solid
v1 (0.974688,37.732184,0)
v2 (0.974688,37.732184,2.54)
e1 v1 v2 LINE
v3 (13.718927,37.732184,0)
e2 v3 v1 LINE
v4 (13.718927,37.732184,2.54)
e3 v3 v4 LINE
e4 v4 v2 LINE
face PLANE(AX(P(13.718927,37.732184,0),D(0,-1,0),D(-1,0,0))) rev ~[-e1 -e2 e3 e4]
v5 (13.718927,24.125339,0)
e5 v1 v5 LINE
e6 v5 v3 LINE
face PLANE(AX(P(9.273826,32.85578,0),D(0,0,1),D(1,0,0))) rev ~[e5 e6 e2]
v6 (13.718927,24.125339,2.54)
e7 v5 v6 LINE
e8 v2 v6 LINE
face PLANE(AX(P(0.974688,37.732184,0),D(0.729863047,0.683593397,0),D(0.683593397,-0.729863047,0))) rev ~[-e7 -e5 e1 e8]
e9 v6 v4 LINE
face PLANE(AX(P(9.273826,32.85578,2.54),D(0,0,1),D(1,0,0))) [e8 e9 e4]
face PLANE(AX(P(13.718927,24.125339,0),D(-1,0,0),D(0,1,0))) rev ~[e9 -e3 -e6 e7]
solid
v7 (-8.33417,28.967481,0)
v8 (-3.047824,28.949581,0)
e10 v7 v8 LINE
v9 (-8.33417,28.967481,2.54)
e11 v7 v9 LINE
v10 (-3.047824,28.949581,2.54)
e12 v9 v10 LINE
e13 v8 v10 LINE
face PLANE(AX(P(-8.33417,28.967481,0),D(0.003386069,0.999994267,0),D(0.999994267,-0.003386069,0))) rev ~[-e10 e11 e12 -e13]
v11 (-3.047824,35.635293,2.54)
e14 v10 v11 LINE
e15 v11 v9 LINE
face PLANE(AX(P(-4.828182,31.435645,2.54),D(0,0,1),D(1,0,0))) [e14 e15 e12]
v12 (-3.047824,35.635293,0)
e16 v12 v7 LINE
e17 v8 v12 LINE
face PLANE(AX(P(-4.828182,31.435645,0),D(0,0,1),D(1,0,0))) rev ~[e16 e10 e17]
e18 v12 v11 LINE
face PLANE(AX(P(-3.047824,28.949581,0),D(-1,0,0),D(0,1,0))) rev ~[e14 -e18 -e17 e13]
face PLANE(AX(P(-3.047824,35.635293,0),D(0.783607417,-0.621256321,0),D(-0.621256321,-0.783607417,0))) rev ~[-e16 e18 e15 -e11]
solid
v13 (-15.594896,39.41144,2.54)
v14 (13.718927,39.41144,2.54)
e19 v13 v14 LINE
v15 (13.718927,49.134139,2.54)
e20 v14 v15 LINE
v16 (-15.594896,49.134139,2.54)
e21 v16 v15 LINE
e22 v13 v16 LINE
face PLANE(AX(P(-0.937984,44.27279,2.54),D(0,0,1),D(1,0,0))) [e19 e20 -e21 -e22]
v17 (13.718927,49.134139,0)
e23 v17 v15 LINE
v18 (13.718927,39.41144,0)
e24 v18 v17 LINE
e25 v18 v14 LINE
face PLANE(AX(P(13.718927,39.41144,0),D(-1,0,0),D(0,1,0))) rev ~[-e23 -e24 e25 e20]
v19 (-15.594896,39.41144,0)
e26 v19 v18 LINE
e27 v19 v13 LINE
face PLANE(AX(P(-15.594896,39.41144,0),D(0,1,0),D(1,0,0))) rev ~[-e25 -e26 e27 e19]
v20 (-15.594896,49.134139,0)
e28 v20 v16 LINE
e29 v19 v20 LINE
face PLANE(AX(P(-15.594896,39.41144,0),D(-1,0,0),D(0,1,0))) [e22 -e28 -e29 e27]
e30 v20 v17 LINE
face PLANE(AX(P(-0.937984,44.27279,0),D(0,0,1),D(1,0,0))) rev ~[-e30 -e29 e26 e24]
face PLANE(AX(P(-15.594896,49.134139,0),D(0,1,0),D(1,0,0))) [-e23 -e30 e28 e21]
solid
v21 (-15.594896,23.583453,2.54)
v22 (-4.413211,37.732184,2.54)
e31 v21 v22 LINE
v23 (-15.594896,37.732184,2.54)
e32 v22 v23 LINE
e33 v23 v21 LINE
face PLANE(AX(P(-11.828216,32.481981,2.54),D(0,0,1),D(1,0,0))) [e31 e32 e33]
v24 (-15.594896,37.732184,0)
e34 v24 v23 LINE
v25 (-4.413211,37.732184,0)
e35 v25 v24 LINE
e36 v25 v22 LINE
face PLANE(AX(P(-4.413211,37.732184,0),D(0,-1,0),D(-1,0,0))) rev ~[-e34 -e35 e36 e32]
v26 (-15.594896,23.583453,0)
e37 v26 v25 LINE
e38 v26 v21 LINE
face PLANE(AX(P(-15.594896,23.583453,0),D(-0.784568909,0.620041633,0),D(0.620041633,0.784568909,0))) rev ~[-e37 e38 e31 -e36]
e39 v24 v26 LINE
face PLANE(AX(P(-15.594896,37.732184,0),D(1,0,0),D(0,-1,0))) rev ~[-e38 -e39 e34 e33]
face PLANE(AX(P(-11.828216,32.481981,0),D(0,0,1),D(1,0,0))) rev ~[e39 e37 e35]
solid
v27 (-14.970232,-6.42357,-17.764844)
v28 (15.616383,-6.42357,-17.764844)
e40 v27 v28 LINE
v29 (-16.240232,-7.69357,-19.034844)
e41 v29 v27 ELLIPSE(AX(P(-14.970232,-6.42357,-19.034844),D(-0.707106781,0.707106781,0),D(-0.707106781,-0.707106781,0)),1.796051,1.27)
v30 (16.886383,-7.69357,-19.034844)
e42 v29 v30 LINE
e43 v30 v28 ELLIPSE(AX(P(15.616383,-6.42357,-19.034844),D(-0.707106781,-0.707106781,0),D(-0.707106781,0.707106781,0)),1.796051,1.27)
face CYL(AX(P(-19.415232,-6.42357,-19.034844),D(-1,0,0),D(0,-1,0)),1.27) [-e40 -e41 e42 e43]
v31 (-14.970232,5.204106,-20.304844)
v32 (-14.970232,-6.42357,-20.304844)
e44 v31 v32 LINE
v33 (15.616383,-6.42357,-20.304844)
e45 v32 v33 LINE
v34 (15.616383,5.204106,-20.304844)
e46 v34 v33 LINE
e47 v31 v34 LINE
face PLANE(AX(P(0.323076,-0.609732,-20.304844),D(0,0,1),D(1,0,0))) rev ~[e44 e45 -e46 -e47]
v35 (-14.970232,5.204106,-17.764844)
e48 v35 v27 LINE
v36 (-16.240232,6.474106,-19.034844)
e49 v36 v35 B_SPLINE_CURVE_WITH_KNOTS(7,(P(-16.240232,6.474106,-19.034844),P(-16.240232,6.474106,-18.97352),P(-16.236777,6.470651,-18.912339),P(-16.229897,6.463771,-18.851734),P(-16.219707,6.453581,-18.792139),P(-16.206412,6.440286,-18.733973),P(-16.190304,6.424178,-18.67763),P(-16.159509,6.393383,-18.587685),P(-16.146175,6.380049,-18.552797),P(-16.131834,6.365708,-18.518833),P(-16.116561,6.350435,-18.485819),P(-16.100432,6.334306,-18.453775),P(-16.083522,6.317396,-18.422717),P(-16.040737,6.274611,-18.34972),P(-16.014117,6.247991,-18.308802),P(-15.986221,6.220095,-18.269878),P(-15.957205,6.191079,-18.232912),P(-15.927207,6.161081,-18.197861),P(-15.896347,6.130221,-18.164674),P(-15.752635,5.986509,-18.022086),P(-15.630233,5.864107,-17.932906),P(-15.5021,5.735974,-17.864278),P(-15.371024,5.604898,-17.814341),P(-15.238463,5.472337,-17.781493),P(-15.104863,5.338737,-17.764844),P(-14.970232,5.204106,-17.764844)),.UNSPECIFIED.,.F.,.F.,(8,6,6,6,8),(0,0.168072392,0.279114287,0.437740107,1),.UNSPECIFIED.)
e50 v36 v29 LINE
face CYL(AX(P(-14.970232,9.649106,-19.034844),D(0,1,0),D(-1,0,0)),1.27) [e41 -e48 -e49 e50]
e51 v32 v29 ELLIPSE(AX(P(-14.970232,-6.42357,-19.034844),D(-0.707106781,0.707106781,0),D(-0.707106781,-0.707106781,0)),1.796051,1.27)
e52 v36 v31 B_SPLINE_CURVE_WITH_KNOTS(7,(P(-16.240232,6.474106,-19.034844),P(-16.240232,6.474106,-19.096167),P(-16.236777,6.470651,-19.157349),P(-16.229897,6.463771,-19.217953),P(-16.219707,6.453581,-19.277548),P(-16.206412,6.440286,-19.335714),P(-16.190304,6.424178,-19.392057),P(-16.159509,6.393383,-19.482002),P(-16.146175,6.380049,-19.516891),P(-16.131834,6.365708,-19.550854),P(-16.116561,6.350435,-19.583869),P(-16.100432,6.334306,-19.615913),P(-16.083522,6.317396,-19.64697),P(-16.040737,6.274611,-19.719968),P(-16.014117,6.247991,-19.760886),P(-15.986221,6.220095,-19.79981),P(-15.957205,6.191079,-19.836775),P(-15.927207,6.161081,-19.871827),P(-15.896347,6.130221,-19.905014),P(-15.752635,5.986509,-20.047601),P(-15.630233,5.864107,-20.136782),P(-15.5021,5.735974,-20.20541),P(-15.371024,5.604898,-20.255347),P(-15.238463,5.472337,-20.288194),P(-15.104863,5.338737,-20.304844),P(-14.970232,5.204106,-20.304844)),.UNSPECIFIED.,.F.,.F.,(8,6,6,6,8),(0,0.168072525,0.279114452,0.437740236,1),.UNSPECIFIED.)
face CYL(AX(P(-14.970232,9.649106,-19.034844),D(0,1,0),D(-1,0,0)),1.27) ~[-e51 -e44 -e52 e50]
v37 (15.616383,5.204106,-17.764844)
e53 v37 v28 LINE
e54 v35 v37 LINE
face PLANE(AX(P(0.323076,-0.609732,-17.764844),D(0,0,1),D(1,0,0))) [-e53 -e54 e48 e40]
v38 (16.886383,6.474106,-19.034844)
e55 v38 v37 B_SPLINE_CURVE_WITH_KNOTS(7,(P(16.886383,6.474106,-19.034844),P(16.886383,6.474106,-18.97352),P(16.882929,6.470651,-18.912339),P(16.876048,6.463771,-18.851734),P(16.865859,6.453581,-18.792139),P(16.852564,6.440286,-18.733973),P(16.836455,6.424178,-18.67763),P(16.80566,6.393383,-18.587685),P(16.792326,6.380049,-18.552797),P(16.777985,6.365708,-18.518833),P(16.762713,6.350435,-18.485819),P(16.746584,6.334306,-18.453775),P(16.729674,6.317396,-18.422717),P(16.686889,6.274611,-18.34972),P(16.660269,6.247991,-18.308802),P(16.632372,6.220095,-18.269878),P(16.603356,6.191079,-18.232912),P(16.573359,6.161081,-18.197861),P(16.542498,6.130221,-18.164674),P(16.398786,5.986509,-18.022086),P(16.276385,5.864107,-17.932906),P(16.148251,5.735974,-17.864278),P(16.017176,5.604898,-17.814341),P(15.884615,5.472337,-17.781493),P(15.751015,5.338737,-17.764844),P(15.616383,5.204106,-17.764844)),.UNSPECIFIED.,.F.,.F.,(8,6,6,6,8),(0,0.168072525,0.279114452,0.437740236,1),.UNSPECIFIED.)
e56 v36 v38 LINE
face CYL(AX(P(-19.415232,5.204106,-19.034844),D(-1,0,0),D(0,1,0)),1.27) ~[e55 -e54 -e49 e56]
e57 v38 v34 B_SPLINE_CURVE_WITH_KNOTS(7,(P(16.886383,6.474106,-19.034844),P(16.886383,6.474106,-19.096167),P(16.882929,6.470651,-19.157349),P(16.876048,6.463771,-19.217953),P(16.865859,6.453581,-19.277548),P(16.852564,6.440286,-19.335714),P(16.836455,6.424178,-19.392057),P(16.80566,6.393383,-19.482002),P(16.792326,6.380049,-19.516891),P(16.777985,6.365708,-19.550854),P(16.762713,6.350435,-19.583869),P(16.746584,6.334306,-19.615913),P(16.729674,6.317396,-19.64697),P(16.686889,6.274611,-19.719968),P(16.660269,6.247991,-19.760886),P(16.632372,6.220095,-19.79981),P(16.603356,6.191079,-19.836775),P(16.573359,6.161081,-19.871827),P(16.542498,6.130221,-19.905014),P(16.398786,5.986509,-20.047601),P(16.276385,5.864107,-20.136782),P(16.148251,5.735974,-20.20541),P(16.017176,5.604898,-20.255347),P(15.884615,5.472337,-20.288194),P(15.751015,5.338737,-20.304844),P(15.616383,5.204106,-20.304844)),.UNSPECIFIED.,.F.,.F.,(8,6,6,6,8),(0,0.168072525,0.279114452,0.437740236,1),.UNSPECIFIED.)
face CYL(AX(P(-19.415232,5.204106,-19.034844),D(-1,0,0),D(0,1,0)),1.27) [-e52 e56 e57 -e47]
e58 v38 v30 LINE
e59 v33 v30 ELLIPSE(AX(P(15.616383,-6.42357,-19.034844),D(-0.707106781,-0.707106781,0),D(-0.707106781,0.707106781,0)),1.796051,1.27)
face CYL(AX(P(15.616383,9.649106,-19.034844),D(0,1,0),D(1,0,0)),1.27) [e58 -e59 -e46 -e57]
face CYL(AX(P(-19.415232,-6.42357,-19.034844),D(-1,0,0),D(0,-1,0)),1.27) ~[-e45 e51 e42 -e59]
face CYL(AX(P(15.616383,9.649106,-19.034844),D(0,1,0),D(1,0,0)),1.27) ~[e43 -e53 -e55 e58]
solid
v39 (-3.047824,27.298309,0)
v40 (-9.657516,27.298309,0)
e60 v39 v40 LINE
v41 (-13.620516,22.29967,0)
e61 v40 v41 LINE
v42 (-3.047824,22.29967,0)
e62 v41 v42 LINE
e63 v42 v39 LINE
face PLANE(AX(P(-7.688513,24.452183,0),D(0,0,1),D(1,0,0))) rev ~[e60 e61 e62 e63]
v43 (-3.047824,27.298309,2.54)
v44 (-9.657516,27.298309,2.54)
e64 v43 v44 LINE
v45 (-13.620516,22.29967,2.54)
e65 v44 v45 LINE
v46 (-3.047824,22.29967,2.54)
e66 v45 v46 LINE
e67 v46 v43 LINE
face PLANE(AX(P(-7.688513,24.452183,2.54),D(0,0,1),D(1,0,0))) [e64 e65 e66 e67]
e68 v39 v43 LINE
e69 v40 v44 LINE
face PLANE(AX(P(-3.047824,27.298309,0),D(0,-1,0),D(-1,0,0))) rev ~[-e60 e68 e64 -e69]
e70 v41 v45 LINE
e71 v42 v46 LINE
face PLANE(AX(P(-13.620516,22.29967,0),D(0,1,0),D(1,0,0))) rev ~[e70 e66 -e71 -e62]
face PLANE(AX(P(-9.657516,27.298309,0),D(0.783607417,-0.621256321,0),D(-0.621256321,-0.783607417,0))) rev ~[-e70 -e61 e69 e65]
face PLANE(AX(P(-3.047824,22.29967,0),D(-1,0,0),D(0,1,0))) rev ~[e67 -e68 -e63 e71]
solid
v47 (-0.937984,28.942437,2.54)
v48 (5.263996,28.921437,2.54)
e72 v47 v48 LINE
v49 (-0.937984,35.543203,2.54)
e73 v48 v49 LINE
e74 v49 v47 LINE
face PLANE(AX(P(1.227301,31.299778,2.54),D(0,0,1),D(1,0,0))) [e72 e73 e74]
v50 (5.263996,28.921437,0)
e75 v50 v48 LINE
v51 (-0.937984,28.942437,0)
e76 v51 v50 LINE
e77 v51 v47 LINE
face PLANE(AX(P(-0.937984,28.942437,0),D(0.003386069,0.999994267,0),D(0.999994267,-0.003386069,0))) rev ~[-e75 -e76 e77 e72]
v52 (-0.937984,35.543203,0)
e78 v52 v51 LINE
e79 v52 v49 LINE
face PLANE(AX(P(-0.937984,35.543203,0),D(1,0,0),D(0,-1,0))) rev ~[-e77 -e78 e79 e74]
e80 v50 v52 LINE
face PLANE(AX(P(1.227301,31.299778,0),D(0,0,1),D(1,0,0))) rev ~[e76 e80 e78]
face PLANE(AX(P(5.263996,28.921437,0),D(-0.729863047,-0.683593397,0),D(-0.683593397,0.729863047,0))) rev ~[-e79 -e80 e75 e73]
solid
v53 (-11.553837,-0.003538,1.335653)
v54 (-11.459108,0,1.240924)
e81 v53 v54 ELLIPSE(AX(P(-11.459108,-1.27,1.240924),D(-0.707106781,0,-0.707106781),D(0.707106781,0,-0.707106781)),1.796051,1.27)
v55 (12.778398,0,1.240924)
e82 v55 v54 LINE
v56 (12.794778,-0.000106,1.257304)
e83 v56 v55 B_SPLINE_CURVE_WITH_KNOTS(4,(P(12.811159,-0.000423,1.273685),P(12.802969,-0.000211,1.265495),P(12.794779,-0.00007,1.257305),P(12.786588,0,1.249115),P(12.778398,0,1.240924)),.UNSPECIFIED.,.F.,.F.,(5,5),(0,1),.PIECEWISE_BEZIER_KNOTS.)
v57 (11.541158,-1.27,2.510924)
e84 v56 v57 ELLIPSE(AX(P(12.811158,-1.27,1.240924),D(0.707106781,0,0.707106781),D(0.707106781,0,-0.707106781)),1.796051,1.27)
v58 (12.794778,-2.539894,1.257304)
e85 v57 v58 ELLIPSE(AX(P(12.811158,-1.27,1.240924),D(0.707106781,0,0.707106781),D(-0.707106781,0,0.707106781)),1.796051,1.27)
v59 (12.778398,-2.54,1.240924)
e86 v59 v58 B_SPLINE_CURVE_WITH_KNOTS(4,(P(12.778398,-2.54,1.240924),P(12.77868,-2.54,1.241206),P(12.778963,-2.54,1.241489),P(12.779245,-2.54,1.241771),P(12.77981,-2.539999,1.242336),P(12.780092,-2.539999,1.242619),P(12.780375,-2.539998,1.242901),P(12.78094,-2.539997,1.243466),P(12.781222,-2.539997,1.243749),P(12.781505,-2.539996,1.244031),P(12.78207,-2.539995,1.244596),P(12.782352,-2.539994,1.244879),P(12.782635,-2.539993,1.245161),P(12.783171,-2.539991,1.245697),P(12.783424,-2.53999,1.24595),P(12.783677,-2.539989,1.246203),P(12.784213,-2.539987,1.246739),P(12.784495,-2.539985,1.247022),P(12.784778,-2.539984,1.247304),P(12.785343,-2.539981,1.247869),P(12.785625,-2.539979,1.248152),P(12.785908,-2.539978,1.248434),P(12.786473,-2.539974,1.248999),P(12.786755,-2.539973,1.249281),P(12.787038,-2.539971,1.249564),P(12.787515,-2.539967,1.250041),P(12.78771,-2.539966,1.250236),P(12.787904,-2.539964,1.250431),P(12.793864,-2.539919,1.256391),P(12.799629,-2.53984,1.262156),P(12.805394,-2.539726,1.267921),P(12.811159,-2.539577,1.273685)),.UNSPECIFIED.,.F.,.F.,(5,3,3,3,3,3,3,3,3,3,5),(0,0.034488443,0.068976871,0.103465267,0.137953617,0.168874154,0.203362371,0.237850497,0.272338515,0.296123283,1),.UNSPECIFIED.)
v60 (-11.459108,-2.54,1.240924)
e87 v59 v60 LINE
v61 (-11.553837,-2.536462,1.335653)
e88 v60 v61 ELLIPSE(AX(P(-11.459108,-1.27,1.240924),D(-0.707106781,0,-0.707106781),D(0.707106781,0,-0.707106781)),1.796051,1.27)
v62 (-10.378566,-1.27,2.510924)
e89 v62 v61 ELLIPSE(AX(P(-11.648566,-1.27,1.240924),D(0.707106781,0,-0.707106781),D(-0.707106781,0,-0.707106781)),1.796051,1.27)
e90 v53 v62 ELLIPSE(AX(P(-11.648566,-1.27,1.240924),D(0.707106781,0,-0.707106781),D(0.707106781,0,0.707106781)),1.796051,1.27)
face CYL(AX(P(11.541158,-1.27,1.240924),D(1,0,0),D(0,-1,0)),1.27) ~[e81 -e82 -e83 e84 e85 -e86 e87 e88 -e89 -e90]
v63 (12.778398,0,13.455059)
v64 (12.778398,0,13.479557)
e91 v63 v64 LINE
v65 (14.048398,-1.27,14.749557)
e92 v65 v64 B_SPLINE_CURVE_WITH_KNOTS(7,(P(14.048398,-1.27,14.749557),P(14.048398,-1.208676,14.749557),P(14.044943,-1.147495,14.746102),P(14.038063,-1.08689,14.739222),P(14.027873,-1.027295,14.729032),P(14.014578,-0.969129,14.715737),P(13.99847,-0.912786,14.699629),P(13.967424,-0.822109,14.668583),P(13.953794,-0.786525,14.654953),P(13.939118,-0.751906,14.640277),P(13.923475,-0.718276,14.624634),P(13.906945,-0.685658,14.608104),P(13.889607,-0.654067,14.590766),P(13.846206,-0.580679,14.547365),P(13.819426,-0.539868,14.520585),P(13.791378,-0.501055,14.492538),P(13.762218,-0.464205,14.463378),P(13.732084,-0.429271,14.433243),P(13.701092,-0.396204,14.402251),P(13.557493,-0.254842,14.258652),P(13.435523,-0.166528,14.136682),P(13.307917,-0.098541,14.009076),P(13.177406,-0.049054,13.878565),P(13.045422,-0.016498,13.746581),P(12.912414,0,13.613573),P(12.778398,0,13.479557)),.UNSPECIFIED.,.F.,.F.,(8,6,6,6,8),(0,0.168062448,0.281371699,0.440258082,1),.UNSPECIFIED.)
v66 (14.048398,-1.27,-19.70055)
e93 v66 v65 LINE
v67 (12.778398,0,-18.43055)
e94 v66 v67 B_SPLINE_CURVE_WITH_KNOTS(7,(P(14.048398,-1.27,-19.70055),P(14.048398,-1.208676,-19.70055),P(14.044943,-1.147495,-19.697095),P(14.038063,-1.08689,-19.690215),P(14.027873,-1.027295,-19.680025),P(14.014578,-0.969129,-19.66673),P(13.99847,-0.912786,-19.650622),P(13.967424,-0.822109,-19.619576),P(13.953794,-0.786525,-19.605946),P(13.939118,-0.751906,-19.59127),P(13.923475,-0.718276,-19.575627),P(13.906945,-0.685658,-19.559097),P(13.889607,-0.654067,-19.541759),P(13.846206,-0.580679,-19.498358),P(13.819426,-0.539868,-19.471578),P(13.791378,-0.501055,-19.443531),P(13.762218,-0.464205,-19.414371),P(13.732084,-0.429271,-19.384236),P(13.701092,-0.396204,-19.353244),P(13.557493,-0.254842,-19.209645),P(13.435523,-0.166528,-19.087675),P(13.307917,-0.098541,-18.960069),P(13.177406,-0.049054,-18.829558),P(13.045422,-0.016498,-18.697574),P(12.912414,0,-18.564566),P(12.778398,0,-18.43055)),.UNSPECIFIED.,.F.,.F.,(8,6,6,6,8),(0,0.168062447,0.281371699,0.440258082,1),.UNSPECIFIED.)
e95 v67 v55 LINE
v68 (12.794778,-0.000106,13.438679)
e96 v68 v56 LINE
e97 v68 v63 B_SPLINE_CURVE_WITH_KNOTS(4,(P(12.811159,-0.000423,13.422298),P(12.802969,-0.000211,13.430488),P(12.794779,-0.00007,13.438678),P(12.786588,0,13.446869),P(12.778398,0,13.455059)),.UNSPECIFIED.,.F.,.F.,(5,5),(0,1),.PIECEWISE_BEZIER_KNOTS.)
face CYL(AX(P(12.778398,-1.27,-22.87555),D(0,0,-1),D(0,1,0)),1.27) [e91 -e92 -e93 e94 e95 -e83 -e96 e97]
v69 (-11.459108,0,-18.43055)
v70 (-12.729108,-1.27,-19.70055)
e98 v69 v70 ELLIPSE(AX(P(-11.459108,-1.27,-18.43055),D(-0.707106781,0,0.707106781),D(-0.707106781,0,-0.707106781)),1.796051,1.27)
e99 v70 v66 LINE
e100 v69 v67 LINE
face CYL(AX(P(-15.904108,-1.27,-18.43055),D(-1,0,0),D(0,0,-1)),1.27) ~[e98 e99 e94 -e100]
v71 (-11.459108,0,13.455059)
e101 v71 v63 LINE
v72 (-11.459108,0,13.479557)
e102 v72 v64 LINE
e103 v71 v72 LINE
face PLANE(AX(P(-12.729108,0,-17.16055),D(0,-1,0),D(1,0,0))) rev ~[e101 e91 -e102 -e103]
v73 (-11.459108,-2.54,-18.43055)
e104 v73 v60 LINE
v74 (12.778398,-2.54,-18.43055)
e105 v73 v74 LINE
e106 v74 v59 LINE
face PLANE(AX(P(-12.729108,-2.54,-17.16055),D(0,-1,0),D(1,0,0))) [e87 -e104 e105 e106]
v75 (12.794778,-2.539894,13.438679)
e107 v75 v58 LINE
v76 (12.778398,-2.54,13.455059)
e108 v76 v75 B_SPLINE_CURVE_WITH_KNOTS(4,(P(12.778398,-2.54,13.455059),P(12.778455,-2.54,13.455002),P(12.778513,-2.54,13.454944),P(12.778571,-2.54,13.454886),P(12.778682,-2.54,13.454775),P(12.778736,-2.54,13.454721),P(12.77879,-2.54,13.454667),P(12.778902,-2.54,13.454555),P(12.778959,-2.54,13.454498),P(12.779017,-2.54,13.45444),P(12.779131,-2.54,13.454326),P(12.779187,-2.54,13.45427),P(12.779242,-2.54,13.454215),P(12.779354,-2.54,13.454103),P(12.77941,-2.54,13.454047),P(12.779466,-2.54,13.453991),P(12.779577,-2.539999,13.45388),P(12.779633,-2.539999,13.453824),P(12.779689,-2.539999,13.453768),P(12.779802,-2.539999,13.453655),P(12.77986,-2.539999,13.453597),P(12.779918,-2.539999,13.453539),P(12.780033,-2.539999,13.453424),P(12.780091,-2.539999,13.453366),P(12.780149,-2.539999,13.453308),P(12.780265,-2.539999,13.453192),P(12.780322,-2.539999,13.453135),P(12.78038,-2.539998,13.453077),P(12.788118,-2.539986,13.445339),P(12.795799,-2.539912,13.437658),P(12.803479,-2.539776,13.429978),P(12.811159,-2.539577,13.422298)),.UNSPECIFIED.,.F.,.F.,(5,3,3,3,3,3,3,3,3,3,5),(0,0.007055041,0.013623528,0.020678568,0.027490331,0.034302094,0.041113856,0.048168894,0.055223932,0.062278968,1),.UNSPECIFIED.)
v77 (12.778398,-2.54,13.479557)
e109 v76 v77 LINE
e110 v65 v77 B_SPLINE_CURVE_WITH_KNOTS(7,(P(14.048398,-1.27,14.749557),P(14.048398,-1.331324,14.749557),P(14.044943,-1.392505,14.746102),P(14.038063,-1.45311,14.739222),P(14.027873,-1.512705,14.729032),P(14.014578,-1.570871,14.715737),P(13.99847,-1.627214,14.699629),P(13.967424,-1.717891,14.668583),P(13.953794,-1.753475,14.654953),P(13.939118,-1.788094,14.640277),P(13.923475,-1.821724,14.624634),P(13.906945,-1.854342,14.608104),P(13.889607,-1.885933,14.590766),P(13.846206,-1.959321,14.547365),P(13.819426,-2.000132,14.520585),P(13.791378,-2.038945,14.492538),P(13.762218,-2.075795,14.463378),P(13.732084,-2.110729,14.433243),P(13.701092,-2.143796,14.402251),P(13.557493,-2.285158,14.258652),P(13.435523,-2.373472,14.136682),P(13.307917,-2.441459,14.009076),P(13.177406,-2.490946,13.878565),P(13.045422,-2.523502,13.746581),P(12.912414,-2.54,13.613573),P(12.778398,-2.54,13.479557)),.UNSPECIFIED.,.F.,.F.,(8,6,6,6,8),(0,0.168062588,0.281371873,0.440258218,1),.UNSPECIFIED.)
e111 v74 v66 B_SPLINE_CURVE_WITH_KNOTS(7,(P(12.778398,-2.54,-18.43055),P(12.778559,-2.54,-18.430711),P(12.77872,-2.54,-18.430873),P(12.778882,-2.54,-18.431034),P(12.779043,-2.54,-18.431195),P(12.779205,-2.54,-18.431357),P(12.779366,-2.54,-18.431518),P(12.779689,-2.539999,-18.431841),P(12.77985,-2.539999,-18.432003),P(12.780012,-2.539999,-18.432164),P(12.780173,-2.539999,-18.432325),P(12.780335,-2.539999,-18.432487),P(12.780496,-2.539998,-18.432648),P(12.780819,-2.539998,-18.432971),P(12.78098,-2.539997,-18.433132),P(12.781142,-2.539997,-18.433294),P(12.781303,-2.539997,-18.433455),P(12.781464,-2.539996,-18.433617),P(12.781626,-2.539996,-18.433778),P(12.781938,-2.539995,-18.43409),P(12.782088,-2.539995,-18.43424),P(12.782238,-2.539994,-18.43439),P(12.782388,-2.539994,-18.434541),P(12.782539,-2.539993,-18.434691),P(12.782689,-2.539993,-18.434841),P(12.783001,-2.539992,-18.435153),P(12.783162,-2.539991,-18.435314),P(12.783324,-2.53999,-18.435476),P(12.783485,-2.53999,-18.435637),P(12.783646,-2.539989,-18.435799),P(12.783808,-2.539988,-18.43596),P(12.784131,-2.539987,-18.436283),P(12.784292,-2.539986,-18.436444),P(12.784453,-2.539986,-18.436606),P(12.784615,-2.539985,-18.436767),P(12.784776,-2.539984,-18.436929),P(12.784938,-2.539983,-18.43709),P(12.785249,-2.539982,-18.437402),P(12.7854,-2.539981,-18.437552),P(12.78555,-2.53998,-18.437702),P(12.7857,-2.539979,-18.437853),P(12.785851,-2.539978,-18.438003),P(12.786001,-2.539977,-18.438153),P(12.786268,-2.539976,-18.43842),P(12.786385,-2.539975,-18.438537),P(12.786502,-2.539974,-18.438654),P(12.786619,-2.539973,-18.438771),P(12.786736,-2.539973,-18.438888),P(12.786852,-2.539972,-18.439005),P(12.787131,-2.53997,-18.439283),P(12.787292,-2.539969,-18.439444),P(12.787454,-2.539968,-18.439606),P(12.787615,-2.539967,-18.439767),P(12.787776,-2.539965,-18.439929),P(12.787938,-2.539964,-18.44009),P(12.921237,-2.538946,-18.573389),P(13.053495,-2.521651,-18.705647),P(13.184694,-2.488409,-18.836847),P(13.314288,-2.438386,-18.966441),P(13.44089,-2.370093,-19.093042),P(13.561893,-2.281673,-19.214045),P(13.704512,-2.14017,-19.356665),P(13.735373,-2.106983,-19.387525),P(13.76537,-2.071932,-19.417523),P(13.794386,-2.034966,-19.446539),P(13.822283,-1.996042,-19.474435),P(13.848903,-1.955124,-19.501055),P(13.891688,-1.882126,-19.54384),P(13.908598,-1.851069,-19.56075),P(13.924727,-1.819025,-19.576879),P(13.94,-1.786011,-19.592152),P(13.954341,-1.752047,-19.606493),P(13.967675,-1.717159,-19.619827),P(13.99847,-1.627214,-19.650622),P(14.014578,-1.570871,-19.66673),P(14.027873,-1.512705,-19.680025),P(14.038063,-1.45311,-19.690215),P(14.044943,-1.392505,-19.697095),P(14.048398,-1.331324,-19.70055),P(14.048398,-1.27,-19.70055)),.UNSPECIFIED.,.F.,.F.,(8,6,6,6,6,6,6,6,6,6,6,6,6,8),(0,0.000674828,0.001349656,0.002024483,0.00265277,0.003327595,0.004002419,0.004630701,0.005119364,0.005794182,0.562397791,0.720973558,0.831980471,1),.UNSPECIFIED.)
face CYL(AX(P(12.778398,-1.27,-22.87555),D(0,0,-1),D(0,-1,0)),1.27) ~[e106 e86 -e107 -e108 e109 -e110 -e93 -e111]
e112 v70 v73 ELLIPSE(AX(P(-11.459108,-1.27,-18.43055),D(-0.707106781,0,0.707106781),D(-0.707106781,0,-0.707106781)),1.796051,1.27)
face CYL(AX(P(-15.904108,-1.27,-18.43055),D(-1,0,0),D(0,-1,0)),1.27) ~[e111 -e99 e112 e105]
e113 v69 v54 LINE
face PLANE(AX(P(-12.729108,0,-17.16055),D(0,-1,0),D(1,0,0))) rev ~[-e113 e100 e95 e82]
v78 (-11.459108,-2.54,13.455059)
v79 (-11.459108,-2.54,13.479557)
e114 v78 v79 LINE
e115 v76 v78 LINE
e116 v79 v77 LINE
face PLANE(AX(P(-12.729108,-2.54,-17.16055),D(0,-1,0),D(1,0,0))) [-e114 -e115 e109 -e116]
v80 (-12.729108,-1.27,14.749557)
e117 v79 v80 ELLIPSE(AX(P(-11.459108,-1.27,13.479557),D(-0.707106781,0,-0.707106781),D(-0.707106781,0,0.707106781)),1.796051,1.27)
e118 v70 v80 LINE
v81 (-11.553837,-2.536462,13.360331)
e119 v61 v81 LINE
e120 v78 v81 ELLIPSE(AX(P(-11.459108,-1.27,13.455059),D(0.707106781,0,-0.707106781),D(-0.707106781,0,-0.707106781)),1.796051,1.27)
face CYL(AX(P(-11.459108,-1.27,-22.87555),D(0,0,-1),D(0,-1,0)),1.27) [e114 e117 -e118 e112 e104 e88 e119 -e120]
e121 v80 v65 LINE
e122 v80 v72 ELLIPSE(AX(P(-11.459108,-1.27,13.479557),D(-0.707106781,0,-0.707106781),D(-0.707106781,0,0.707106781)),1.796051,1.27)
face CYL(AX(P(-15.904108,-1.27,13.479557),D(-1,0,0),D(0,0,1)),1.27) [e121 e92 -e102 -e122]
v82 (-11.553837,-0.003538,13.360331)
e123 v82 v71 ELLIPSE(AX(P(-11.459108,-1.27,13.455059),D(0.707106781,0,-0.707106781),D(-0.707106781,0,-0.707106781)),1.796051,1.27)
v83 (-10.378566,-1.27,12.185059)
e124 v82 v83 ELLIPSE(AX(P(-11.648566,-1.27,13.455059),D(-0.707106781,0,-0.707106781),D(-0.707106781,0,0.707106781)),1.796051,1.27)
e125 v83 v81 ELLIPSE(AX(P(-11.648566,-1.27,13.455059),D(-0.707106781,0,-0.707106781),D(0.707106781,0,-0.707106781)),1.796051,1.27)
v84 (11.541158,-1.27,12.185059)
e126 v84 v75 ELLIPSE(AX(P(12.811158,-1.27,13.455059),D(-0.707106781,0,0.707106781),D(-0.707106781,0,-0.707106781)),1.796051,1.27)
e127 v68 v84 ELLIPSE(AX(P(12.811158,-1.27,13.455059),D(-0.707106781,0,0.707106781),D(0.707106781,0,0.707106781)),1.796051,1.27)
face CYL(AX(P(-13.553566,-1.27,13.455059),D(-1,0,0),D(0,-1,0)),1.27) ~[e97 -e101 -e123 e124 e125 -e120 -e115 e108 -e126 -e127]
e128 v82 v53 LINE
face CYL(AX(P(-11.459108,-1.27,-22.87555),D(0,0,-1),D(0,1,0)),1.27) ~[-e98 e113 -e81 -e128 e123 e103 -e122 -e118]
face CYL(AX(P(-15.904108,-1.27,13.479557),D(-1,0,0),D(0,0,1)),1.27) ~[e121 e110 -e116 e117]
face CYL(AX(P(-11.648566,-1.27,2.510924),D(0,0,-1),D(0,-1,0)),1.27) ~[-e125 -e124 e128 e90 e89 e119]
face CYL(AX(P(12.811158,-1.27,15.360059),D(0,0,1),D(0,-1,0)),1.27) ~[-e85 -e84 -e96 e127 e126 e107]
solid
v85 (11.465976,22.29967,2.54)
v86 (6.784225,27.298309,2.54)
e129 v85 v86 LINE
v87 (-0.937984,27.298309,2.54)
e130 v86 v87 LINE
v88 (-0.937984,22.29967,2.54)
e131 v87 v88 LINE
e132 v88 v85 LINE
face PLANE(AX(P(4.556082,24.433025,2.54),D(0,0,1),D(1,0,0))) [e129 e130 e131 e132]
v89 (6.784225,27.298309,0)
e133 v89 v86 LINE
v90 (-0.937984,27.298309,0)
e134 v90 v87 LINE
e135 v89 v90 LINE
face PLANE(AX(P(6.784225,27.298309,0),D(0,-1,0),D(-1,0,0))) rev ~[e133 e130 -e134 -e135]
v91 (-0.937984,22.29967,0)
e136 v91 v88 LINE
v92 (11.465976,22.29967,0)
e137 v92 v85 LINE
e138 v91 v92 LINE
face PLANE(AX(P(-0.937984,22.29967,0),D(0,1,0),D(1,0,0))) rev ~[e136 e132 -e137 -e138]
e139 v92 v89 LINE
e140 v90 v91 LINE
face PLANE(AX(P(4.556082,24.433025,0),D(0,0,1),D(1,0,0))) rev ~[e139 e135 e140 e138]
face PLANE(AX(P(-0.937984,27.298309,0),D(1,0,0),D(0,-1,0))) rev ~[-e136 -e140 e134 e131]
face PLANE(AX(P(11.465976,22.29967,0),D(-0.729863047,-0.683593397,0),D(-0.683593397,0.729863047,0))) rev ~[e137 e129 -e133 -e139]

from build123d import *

# Parameters (mm, degrees)
F0_W          = 26.7775058746
F0_H          = 31.9101065397
F0_W_2        = 21.9197236001
F0_H_2        = 9.6741355956
F1_DEPTH      = 2.54
F2_DEPTH      = 2.54
F3_W          = 33.1266149879
F3_H          = 14.1676757485
F4_DEPTH      = 2.54
F6_W          = 29.3138232082
F6_H          = 9.7226984799
F7_DEPTH      = 2.54
F8_T1_DEPTH   = 33.1275058746
F8_T3_DEPTH   = 40.8001065397
F8_T5_DEPTH   = 9.6741355956
F8_T7_DEPTH   = 21.9197236001
F8_T13_DEPTH  = 12.8491355956
F8_T17_DEPTH  = 25.0947236001
F8_T24_DEPTH  = 12.8491355956
F8_T28_DEPTH  = 25.0947236001
F8_T35_DEPTH  = 25.0947236001
F8_T39_DEPTH  = 12.8491355956
F8_T46_DEPTH  = 12.8491355956
F8_T50_DEPTH  = 25.0947236001
F8_T57_DEPTH  = 25.0947236001
F8_T61_DEPTH  = 12.8491355956
F8_T68_DEPTH  = 25.0947236001
F8_T72_DEPTH  = 12.8491355956
F8_T79_DEPTH  = 12.8491355956
F8_T83_DEPTH  = 25.0947236001
F8_T90_DEPTH  = 25.0947236001
F8_T94_DEPTH  = 12.8491355956
F8_2_T1_DEPTH = 39.4766149879
F8_2_T3_DEPTH = 20.5176757485


# Not quite as in the source:
# - a fillet or chamfer that OpenCascade refuses, or shapes differently, is made with other operations: its cross-section is extruded or revolved along the edge and cut away or added


with BuildPart() as f1:
    # F0 (on Front) → F1 (new body)
    with BuildSketch(Plane.XZ):
        with Locations((0.6596446037, -1.20549649)):
            Rectangle(F0_W, F0_H)
        with Locations((0.5812961608, 7.34799169)):
            Rectangle(F0_W_2, F0_H_2, mode=Mode.SUBTRACT)
    extrude(amount=F1_DEPTH)

    # F2 (add): a face of the model
    f2_faces = [f1.faces().sort_by_distance(p)[0] for p in [
        (0.6596446037, -1.27, -17.1605497599),
    ]]
    extrude(f2_faces, amount=F2_DEPTH)

    # F8: fillet of radius 1.27 on 16 edges, made by hand

    # F8_s2 → F8_t1 (cut)
    with BuildSketch(Plane.YZ.offset(-15.9041083336)):
        with BuildLine():
            ThreePointArc((-1.27, 14.7495567799), (-2.1680256121, 14.377582392), (-2.54, 13.4795567799))
            Line((-2.54, 13.4795567799), (-2.54, 14.7495567799))
            Line((-2.54, 14.7495567799), (-1.27, 14.7495567799))
        make_face()
        with BuildLine():
            ThreePointArc((-2.54, -18.4305497599), (-2.1680256121, -19.328575372), (-1.27, -19.7005497599))
            Line((-1.27, -19.7005497599), (-2.54, -19.7005497599))
            Line((-2.54, -19.7005497599), (-2.54, -18.4305497599))
        make_face()
        with BuildLine():
            ThreePointArc((-1.27, 14.7495567799), (-0.3719743879, 14.377582392), (0, 13.4795567799))
            Line((0, 13.4795567799), (0, 14.7495567799))
            Line((0, 14.7495567799), (-1.27, 14.7495567799))
        make_face()
        with BuildLine():
            ThreePointArc((-1.27, -19.7005497599), (-0.3719743879, -19.328575372), (0, -18.4305497599))
            Line((0, -18.4305497599), (0, -19.7005497599))
            Line((0, -19.7005497599), (-1.27, -19.7005497599))
        make_face()
    extrude(amount=F8_T1_DEPTH, mode=Mode.SUBTRACT)

    # F8_s4 → F8_t3 (cut)
    with BuildSketch(Plane.XY.offset(-22.8755497599)):
        with BuildLine():
            ThreePointArc((-11.4591083336, -2.54), (-12.3571339457, -2.1680256121), (-12.7291083336, -1.27))
            Line((-12.7291083336, -1.27), (-12.7291083336, -2.54))
            Line((-12.7291083336, -2.54), (-11.4591083336, -2.54))
        make_face()
        with BuildLine():
            ThreePointArc((12.778397541, -2.54), (13.6764231532, -2.1680256121), (14.048397541, -1.27))
            Line((14.048397541, -1.27), (14.048397541, -2.54))
            Line((14.048397541, -2.54), (12.778397541, -2.54))
        make_face()
        with BuildLine():
            ThreePointArc((-11.4591083336, 0), (-12.3571339457, -0.3719743879), (-12.7291083336, -1.27))
            Line((-12.7291083336, -1.27), (-12.7291083336, 0))
            Line((-12.7291083336, 0), (-11.4591083336, 0))
        make_face()
        with BuildLine():
            ThreePointArc((12.778397541, 0), (13.6764231532, -0.3719743879), (14.048397541, -1.27))
            Line((14.048397541, -1.27), (14.048397541, 0))
            Line((14.048397541, 0), (12.778397541, 0))
        make_face()
    extrude(amount=F8_T3_DEPTH, mode=Mode.SUBTRACT)

    # F8_s6 → F8_t5 (cut)
    with BuildSketch(Plane.XY.offset(2.5109238923)):
        with BuildLine():
            ThreePointArc((-11.6485656393, -2.54), (-10.7505400272, -2.1680256121), (-10.3785656393, -1.27))
            Line((-10.3785656393, -1.27), (-10.3785656393, -2.54))
            Line((-10.3785656393, -2.54), (-11.6485656393, -2.54))
        make_face()
        with BuildLine():
            ThreePointArc((12.8111579609, -2.54), (11.9131323488, -2.1680256121), (11.5411579609, -1.27))
            Line((11.5411579609, -1.27), (11.5411579609, -2.54))
            Line((11.5411579609, -2.54), (12.8111579609, -2.54))
        make_face()
        with BuildLine():
            ThreePointArc((-10.3785656393, -1.27), (-10.7505400272, -0.3719743879), (-11.6485656393, 0))
            Line((-11.6485656393, 0), (-10.3785656393, 0))
            Line((-10.3785656393, 0), (-10.3785656393, -1.27))
        make_face()
        with BuildLine():
            ThreePointArc((11.5411579609, -1.27), (11.9131323488, -0.3719743879), (12.8111579609, 0))
            Line((12.8111579609, 0), (11.5411579609, 0))
            Line((11.5411579609, 0), (11.5411579609, -1.27))
        make_face()
    extrude(amount=F8_T5_DEPTH, mode=Mode.SUBTRACT)

    # F8_s8 → F8_t7 (cut)
    with BuildSketch(Plane.YZ.offset(-10.3785656393)):
        with BuildLine():
            ThreePointArc((-2.54, 13.4550594878), (-2.1680256121, 12.5570338757), (-1.27, 12.1850594878))
            Line((-1.27, 12.1850594878), (-2.54, 12.1850594878))
            Line((-2.54, 12.1850594878), (-2.54, 13.4550594878))
        make_face()
        with BuildLine():
            ThreePointArc((-2.54, 1.2409238923), (-2.1680256121, 2.1389495044), (-1.27, 2.5109238923))
            Line((-1.27, 2.5109238923), (-2.54, 2.5109238923))
            Line((-2.54, 2.5109238923), (-2.54, 1.2409238923))
        make_face()
        with BuildLine():
            ThreePointArc((-1.27, 12.1850594878), (-0.3719743879, 12.5570338757), (0, 13.4550594878))
            Line((0, 13.4550594878), (0, 12.1850594878))
            Line((0, 12.1850594878), (-1.27, 12.1850594878))
        make_face()
        with BuildLine():
            ThreePointArc((-1.27, 2.5109238923), (-0.3719743879, 2.1389495044), (0, 1.2409238923))
            Line((0, 1.2409238923), (0, 2.5109238923))
            Line((0, 2.5109238923), (-1.27, 2.5109238923))
        make_face()
    extrude(amount=F8_T7_DEPTH, mode=Mode.SUBTRACT)


with BuildPart() as f4:
    # F3 (on Top) → F4 (new body)
    with BuildSketch(Plane.XY):
        with Locations((0.3230758011, -0.609732233)):
            Rectangle(F3_W, F3_H)
    extrude(amount=F4_DEPTH)


with BuildPart() as f4_1:
    # F5: moved
    add(f4.part.moved(Location((0, 0, -20.3048437834))))

    # F8#2: fillet of radius 1.27 on 8 edges, made by hand

    # F8_2_s2 → F8_2_t1 (cut)
    with BuildSketch(Plane.YZ.offset(-19.4152316928)):
        with BuildLine():
            ThreePointArc((6.4741056412, -19.0348437834), (6.1021312534, -18.1368181713), (5.2041056412, -17.7648437834))
            Line((5.2041056412, -17.7648437834), (6.4741056412, -17.7648437834))
            Line((6.4741056412, -17.7648437834), (6.4741056412, -19.0348437834))
        make_face()
        with BuildLine():
            ThreePointArc((-7.6935701072, -19.0348437834), (-7.3215957193, -18.1368181713), (-6.4235701072, -17.7648437834))
            Line((-6.4235701072, -17.7648437834), (-7.6935701072, -17.7648437834))
            Line((-7.6935701072, -17.7648437834), (-7.6935701072, -19.0348437834))
        make_face()
        with BuildLine():
            ThreePointArc((6.4741056412, -19.0348437834), (6.1021312534, -19.9328693955), (5.2041056412, -20.3048437834))
            Line((5.2041056412, -20.3048437834), (6.4741056412, -20.3048437834))
            Line((6.4741056412, -20.3048437834), (6.4741056412, -19.0348437834))
        make_face()
        with BuildLine():
            ThreePointArc((-7.6935701072, -19.0348437834), (-7.3215957193, -19.9328693955), (-6.4235701072, -20.3048437834))
            Line((-6.4235701072, -20.3048437834), (-7.6935701072, -20.3048437834))
            Line((-7.6935701072, -20.3048437834), (-7.6935701072, -19.0348437834))
        make_face()
    extrude(amount=F8_2_T1_DEPTH, mode=Mode.SUBTRACT)

    # F8_2_s4 → F8_2_t3 (cut)
    with BuildSketch(Plane.XZ.offset(-9.6491056412)):
        with BuildLine():
            ThreePointArc((-16.2402316928, -19.0348437834), (-15.8682573049, -18.1368181713), (-14.9702316928, -17.7648437834))
            Line((-14.9702316928, -17.7648437834), (-16.2402316928, -17.7648437834))
            Line((-16.2402316928, -17.7648437834), (-16.2402316928, -19.0348437834))
        make_face()
        with BuildLine():
            ThreePointArc((16.8863832951, -19.0348437834), (16.5144089072, -18.1368181713), (15.6163832951, -17.7648437834))
            Line((15.6163832951, -17.7648437834), (16.8863832951, -17.7648437834))
            Line((16.8863832951, -17.7648437834), (16.8863832951, -19.0348437834))
        make_face()
        with BuildLine():
            ThreePointArc((-16.2402316928, -19.0348437834), (-15.8682573049, -19.9328693955), (-14.9702316928, -20.3048437834))
            Line((-14.9702316928, -20.3048437834), (-16.2402316928, -20.3048437834))
            Line((-16.2402316928, -20.3048437834), (-16.2402316928, -19.0348437834))
        make_face()
        with BuildLine():
            ThreePointArc((16.8863832951, -19.0348437834), (16.5144089072, -19.9328693955), (15.6163832951, -20.3048437834))
            Line((15.6163832951, -20.3048437834), (16.8863832951, -20.3048437834))
            Line((16.8863832951, -20.3048437834), (16.8863832951, -19.0348437834))
        make_face()
    extrude(amount=F8_2_T3_DEPTH, mode=Mode.SUBTRACT)


with BuildPart() as f7:
    # F6 (on Top) → F7 (new body)
    with BuildSketch(Plane.XY):
        with Locations((-0.937984325, 44.2727897316)):
            Rectangle(F6_W, F6_H)
    extrude(amount=F7_DEPTH)


with BuildPart() as f7b:
    # F6 (on Top) → F7, piece 2 (new body)
    with BuildSketch(Plane.XY):
        Polygon((-4.4132112525, 37.7321839333), (-15.5948959291, 37.7321839333), (-15.5948959291, 23.5834531486), align=None)
    extrude(amount=F7_DEPTH)


with BuildPart() as f7c:
    # F6 (on Top) → F7, piece 3 (new body)
    with BuildSketch(Plane.XY):
        Polygon((-3.0478241388, 28.9495810729), (-3.0478241388, 35.6352925301), (-8.334170212, 28.9674811065), align=None)
    extrude(amount=F7_DEPTH)


with BuildPart() as f7d:
    # F6 (on Top) → F7, piece 4 (new body)
    with BuildSketch(Plane.XY):
        Polygon((-9.6575162616, 27.2983089062), (-13.6205162853, 22.299669683), (-3.0478241388, 22.299669683), (-3.0478241388, 27.2983089062), align=None)
    extrude(amount=F7_DEPTH)


with BuildPart() as f7e:
    # F6 (on Top) → F7, piece 5 (new body)
    with BuildSketch(Plane.XY):
        Polygon((-0.937984325, 22.299669683), (11.4659758466, 22.299669683), (6.784225237, 27.2983089062), (-0.937984325, 27.2983089062), align=None)
    extrude(amount=F7_DEPTH)


with BuildPart() as f7f:
    # F6 (on Top) → F7, piece 6 (new body)
    with BuildSketch(Plane.XY):
        Polygon((5.2639957608, 28.9214365184), (-0.937984325, 35.5432033539), (-0.937984325, 28.9424369694), align=None)
    extrude(amount=F7_DEPTH)


with BuildPart() as f7g:
    # F6 (on Top) → F7, piece 7 (new body)
    with BuildSketch(Plane.XY):
        Polygon((13.7189272791, 24.1253394634), (13.7189272791, 37.7321839333), (0.9746883879, 37.7321839333), align=None)
    extrude(amount=F7_DEPTH)


with BuildPart() as f8_tool11:
    # F8_s12 → F8_t13 (new body)
    with BuildSketch(Plane.XY.offset(-0.6640761077)):
        with BuildLine():
            ThreePointArc((-11.6485656393, -2.54), (-10.7505400272, -2.1680256121), (-10.3785656393, -1.27))
            Line((-10.3785656393, -1.27), (-10.3785656393, -2.54))
            Line((-10.3785656393, -2.54), (-11.6485656393, -2.54))
        make_face()
    extrude(amount=F8_T13_DEPTH)

    split(bisect_by=Plane.XY.offset(2.5109238923), keep=Keep.BOTTOM)


with BuildPart() as f8_tool15:
    # F8_s16 → F8_t17 (new body)
    with BuildSketch(Plane.YZ.offset(11.5411579609)):
        with BuildLine():
            ThreePointArc((-2.54, 1.2409238923), (-2.1680256121, 2.1389495044), (-1.27, 2.5109238923))
            Line((-1.27, 2.5109238923), (-2.54, 2.5109238923))
            Line((-2.54, 2.5109238923), (-2.54, 1.2409238923))
        make_face()
    extrude(amount=-F8_T17_DEPTH)

    split(bisect_by=Plane.YZ.offset(-10.3785656393), keep=Keep.BOTTOM)


with BuildPart() as f8_tool11_1:
    add(f8_tool11.part)

    # F8_t19: intersect F8_tool15
    add(f8_tool15.part, mode=Mode.INTERSECT)


with BuildPart() as f1_1:
    add(f1.part)

    # F8_t9: cut F8_tool11
    add(f8_tool11_1.part, mode=Mode.SUBTRACT)


with BuildPart() as f8_tool22:
    # F8_s23 → F8_t24 (new body)
    with BuildSketch(Plane.XY.offset(2.5109238923)):
        with BuildLine():
            ThreePointArc((-11.6485656393, -2.54), (-10.7505400272, -2.1680256121), (-10.3785656393, -1.27))
            Line((-10.3785656393, -1.27), (-10.3785656393, -2.54))
            Line((-10.3785656393, -2.54), (-11.6485656393, -2.54))
        make_face()
    extrude(amount=F8_T24_DEPTH)

    split(bisect_by=Plane.XY.offset(12.1850594878), keep=Keep.TOP)


with BuildPart() as f8_tool26:
    # F8_s27 → F8_t28 (new body)
    with BuildSketch(Plane.YZ.offset(-13.5535656393)):
        with BuildLine():
            ThreePointArc((-2.54, 13.4550594878), (-2.1680256121, 12.5570338757), (-1.27, 12.1850594878))
            Line((-1.27, 12.1850594878), (-2.54, 12.1850594878))
            Line((-2.54, 12.1850594878), (-2.54, 13.4550594878))
        make_face()
    extrude(amount=F8_T28_DEPTH)

    split(bisect_by=Plane.YZ.offset(-10.3785656393), keep=Keep.BOTTOM)


with BuildPart() as f8_tool22_1:
    add(f8_tool22.part)

    # F8_t30: intersect F8_tool26
    add(f8_tool26.part, mode=Mode.INTERSECT)


with BuildPart() as f1_2:
    add(f1_1.part)

    # F8_t20: cut F8_tool22
    add(f8_tool22_1.part, mode=Mode.SUBTRACT)


with BuildPart() as f8_tool33:
    # F8_s34 → F8_t35 (new body)
    with BuildSketch(Plane.YZ.offset(-10.3785656393)):
        with BuildLine():
            ThreePointArc((-2.54, 13.4550594878), (-2.1680256121, 12.5570338757), (-1.27, 12.1850594878))
            Line((-1.27, 12.1850594878), (-2.54, 12.1850594878))
            Line((-2.54, 12.1850594878), (-2.54, 13.4550594878))
        make_face()
    extrude(amount=F8_T35_DEPTH)

    split(bisect_by=Plane.YZ.offset(11.5411579609), keep=Keep.TOP)


with BuildPart() as f8_tool37:
    # F8_s38 → F8_t39 (new body)
    with BuildSketch(Plane.XY.offset(15.3600594878)):
        with BuildLine():
            ThreePointArc((12.8111579609, -2.54), (11.9131323488, -2.1680256121), (11.5411579609, -1.27))
            Line((11.5411579609, -1.27), (11.5411579609, -2.54))
            Line((11.5411579609, -2.54), (12.8111579609, -2.54))
        make_face()
    extrude(amount=-F8_T39_DEPTH)

    split(bisect_by=Plane.XY.offset(12.1850594878), keep=Keep.TOP)


with BuildPart() as f8_tool33_1:
    add(f8_tool33.part)

    # F8_t41: intersect F8_tool37
    add(f8_tool37.part, mode=Mode.INTERSECT)


with BuildPart() as f1_3:
    add(f1_2.part)

    # F8_t31: cut F8_tool33
    add(f8_tool33_1.part, mode=Mode.SUBTRACT)


with BuildPart() as f8_tool44:
    # F8_s45 → F8_t46 (new body)
    with BuildSketch(Plane.XY.offset(12.1850594878)):
        with BuildLine():
            ThreePointArc((12.8111579609, -2.54), (11.9131323488, -2.1680256121), (11.5411579609, -1.27))
            Line((11.5411579609, -1.27), (11.5411579609, -2.54))
            Line((11.5411579609, -2.54), (12.8111579609, -2.54))
        make_face()
    extrude(amount=-F8_T46_DEPTH)

    split(bisect_by=Plane.XY.offset(2.5109238923), keep=Keep.BOTTOM)


with BuildPart() as f8_tool48:
    # F8_s49 → F8_t50 (new body)
    with BuildSketch(Plane.YZ.offset(14.7161579609)):
        with BuildLine():
            ThreePointArc((-2.54, 1.2409238923), (-2.1680256121, 2.1389495044), (-1.27, 2.5109238923))
            Line((-1.27, 2.5109238923), (-2.54, 2.5109238923))
            Line((-2.54, 2.5109238923), (-2.54, 1.2409238923))
        make_face()
    extrude(amount=-F8_T50_DEPTH)

    split(bisect_by=Plane.YZ.offset(11.5411579609), keep=Keep.TOP)


with BuildPart() as f8_tool44_1:
    add(f8_tool44.part)

    # F8_t52: intersect F8_tool48
    add(f8_tool48.part, mode=Mode.INTERSECT)


with BuildPart() as f1_4:
    add(f1_3.part)

    # F8_t42: cut F8_tool44
    add(f8_tool44_1.part, mode=Mode.SUBTRACT)


with BuildPart() as f8_tool55:
    # F8_s56 → F8_t57 (new body)
    with BuildSketch(Plane.YZ.offset(11.5411579609)):
        with BuildLine():
            ThreePointArc((-1.27, 2.5109238923), (-0.3719743879, 2.1389495044), (0, 1.2409238923))
            Line((0, 1.2409238923), (0, 2.5109238923))
            Line((0, 2.5109238923), (-1.27, 2.5109238923))
        make_face()
    extrude(amount=-F8_T57_DEPTH)

    split(bisect_by=Plane.YZ.offset(-10.3785656393), keep=Keep.BOTTOM)


with BuildPart() as f8_tool59:
    # F8_s60 → F8_t61 (new body)
    with BuildSketch(Plane.XY.offset(-0.6640761077)):
        with BuildLine():
            ThreePointArc((-10.3785656393, -1.27), (-10.7505400272, -0.3719743879), (-11.6485656393, 0))
            Line((-11.6485656393, 0), (-10.3785656393, 0))
            Line((-10.3785656393, 0), (-10.3785656393, -1.27))
        make_face()
    extrude(amount=F8_T61_DEPTH)

    split(bisect_by=Plane.XY.offset(2.5109238923), keep=Keep.BOTTOM)


with BuildPart() as f8_tool55_1:
    add(f8_tool55.part)

    # F8_t63: intersect F8_tool59
    add(f8_tool59.part, mode=Mode.INTERSECT)


with BuildPart() as f1_5:
    add(f1_4.part)

    # F8_t53: cut F8_tool55
    add(f8_tool55_1.part, mode=Mode.SUBTRACT)


with BuildPart() as f8_tool66:
    # F8_s67 → F8_t68 (new body)
    with BuildSketch(Plane.YZ.offset(-13.5535656393)):
        with BuildLine():
            ThreePointArc((-1.27, 12.1850594878), (-0.3719743879, 12.5570338757), (0, 13.4550594878))
            Line((0, 13.4550594878), (0, 12.1850594878))
            Line((0, 12.1850594878), (-1.27, 12.1850594878))
        make_face()
    extrude(amount=F8_T68_DEPTH)

    split(bisect_by=Plane.YZ.offset(-10.3785656393), keep=Keep.BOTTOM)


with BuildPart() as f8_tool70:
    # F8_s71 → F8_t72 (new body)
    with BuildSketch(Plane.XY.offset(2.5109238923)):
        with BuildLine():
            ThreePointArc((-10.3785656393, -1.27), (-10.7505400272, -0.3719743879), (-11.6485656393, 0))
            Line((-11.6485656393, 0), (-10.3785656393, 0))
            Line((-10.3785656393, 0), (-10.3785656393, -1.27))
        make_face()
    extrude(amount=F8_T72_DEPTH)

    split(bisect_by=Plane.XY.offset(12.1850594878), keep=Keep.TOP)


with BuildPart() as f8_tool66_1:
    add(f8_tool66.part)

    # F8_t74: intersect F8_tool70
    add(f8_tool70.part, mode=Mode.INTERSECT)


with BuildPart() as f1_6:
    add(f1_5.part)

    # F8_t64: cut F8_tool66
    add(f8_tool66_1.part, mode=Mode.SUBTRACT)


with BuildPart() as f8_tool77:
    # F8_s78 → F8_t79 (new body)
    with BuildSketch(Plane.XY.offset(15.3600594878)):
        with BuildLine():
            ThreePointArc((11.5411579609, -1.27), (11.9131323488, -0.3719743879), (12.8111579609, 0))
            Line((12.8111579609, 0), (11.5411579609, 0))
            Line((11.5411579609, 0), (11.5411579609, -1.27))
        make_face()
    extrude(amount=-F8_T79_DEPTH)

    split(bisect_by=Plane.XY.offset(12.1850594878), keep=Keep.TOP)


with BuildPart() as f8_tool81:
    # F8_s82 → F8_t83 (new body)
    with BuildSketch(Plane.YZ.offset(-10.3785656393)):
        with BuildLine():
            ThreePointArc((-1.27, 12.1850594878), (-0.3719743879, 12.5570338757), (0, 13.4550594878))
            Line((0, 13.4550594878), (0, 12.1850594878))
            Line((0, 12.1850594878), (-1.27, 12.1850594878))
        make_face()
    extrude(amount=F8_T83_DEPTH)

    split(bisect_by=Plane.YZ.offset(11.5411579609), keep=Keep.TOP)


with BuildPart() as f8_tool77_1:
    add(f8_tool77.part)

    # F8_t85: intersect F8_tool81
    add(f8_tool81.part, mode=Mode.INTERSECT)


with BuildPart() as f1_7:
    add(f1_6.part)

    # F8_t75: cut F8_tool77
    add(f8_tool77_1.part, mode=Mode.SUBTRACT)


with BuildPart() as f8_tool88:
    # F8_s89 → F8_t90 (new body)
    with BuildSketch(Plane.YZ.offset(14.7161579609)):
        with BuildLine():
            ThreePointArc((-1.27, 2.5109238923), (-0.3719743879, 2.1389495044), (0, 1.2409238923))
            Line((0, 1.2409238923), (0, 2.5109238923))
            Line((0, 2.5109238923), (-1.27, 2.5109238923))
        make_face()
    extrude(amount=-F8_T90_DEPTH)

    split(bisect_by=Plane.YZ.offset(11.5411579609), keep=Keep.TOP)


with BuildPart() as f8_tool92:
    # F8_s93 → F8_t94 (new body)
    with BuildSketch(Plane.XY.offset(12.1850594878)):
        with BuildLine():
            ThreePointArc((11.5411579609, -1.27), (11.9131323488, -0.3719743879), (12.8111579609, 0))
            Line((12.8111579609, 0), (11.5411579609, 0))
            Line((11.5411579609, 0), (11.5411579609, -1.27))
        make_face()
    extrude(amount=-F8_T94_DEPTH)

    split(bisect_by=Plane.XY.offset(2.5109238923), keep=Keep.BOTTOM)


with BuildPart() as f8_tool88_1:
    add(f8_tool88.part)

    # F8_t96: intersect F8_tool92
    add(f8_tool92.part, mode=Mode.INTERSECT)


with BuildPart() as f1_8:
    add(f1_7.part)

    # F8_t86: cut F8_tool88
    add(f8_tool88_1.part, mode=Mode.SUBTRACT)


solid = Compound([f4_1.part, f7.part, f7b.part, f7c.part, f7d.part, f7e.part, f7f.part, f7g.part, f1_8.part])
